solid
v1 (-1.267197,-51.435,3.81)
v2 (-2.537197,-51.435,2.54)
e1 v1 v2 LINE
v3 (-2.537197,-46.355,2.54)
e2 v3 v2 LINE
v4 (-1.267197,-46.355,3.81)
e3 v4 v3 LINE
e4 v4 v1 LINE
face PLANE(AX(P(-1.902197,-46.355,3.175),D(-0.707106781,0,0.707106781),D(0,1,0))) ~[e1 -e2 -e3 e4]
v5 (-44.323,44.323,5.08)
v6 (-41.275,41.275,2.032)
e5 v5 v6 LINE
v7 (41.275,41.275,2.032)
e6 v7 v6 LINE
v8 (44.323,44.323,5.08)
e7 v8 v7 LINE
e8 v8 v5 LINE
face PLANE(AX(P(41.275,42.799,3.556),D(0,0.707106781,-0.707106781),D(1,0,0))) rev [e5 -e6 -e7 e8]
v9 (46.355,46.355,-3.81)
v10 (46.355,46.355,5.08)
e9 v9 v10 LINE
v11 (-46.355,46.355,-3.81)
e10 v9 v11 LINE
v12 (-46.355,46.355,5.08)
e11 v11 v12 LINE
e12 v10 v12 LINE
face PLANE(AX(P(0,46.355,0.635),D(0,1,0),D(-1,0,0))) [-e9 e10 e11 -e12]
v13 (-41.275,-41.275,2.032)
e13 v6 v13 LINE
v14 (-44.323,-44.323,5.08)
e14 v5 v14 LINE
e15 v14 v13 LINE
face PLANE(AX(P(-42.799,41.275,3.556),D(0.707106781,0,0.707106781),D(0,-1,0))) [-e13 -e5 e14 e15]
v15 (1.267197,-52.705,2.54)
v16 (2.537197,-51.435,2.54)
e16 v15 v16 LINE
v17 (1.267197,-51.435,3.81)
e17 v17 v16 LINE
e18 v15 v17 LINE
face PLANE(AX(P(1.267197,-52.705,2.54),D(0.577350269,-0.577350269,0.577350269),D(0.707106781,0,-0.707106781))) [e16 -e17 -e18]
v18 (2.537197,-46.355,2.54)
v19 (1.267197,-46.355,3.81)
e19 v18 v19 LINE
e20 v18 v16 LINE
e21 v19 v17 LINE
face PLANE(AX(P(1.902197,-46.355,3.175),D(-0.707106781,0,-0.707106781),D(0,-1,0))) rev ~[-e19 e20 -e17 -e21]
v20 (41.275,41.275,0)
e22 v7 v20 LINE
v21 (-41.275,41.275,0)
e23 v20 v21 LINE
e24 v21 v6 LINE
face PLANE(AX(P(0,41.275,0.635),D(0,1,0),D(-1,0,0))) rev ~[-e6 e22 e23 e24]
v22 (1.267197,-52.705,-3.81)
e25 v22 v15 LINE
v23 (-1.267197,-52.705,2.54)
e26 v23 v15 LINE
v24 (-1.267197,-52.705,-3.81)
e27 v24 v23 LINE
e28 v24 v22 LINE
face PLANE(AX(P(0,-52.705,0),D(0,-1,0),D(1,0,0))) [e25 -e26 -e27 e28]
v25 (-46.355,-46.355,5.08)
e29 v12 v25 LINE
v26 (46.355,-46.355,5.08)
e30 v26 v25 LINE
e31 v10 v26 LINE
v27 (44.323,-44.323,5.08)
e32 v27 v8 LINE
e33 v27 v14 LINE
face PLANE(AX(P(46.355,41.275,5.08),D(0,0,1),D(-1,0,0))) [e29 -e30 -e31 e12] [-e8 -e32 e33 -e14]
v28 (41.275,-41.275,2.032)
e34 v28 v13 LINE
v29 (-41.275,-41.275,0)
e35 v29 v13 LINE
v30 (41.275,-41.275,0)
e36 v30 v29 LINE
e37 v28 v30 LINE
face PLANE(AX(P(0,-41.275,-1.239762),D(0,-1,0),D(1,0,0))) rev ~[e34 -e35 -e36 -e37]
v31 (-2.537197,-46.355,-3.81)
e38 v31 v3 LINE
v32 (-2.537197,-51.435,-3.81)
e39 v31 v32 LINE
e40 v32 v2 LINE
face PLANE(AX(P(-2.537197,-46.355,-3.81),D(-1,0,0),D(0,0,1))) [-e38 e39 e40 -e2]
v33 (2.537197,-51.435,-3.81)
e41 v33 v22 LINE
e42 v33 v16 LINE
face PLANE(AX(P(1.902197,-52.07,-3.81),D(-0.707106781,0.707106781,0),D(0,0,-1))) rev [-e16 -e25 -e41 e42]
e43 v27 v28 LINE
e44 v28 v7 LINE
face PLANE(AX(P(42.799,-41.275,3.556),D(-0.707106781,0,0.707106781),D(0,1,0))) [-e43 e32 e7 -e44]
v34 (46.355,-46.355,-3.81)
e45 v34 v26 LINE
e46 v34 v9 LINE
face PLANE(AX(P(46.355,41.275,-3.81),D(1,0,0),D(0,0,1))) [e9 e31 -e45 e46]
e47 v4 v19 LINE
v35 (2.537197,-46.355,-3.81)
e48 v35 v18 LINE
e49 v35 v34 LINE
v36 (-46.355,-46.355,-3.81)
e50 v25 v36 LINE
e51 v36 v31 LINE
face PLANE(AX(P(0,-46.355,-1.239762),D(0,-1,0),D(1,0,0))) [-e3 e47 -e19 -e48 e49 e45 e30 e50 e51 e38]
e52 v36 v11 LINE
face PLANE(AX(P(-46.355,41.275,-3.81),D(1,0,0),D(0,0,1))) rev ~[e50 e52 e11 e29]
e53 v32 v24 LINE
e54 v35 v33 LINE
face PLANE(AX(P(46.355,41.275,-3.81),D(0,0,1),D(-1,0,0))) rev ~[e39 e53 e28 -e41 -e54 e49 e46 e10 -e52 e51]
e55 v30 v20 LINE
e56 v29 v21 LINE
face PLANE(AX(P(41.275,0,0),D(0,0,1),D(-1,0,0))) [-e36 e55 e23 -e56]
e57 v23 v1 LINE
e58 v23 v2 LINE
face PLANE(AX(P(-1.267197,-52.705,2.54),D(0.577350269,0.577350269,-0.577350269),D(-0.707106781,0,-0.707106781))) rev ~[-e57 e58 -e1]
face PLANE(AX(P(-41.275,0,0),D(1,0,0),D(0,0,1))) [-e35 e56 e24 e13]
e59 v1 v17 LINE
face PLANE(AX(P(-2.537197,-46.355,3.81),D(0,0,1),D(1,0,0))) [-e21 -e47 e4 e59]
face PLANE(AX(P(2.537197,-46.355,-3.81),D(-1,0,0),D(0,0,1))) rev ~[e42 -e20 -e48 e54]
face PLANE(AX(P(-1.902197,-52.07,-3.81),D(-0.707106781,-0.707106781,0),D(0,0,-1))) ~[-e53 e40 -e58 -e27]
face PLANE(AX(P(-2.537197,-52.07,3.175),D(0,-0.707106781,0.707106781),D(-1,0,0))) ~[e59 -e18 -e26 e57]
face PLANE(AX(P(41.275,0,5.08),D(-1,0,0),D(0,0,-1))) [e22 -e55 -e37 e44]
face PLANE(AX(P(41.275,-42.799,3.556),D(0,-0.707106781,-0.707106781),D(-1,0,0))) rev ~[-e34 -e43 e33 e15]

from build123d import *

# Parameters (mm, degrees)
F1_DEPTH = 41.275
F2_W     = 82.55
F2_H     = 5.08
F3_DEPTH = 5.08
F4_W     = 92.71
F4_H     = 8.89
F5_DEPTH = 5.08
F6_W     = 5.0743944012
F6_H     = 7.62
F7_DEPTH = 6.35
F8_SIZE  = 1.27
F9_SIZE  = 3.048


with BuildPart() as f1:
    # F0 (on Front) → F1 (new body, symmetric)
    with BuildSketch(Plane.XZ):
        Polygon((-41.275, -3.81), (-41.275, 0), (-41.275, 5.08), (-46.355, 5.08), (-46.355, -3.81), align=None)
        Polygon((41.275, 0), (0, 0), (-41.275, 0), (-41.275, -3.81), (41.275, -3.81), align=None)
        Polygon((41.275, 5.08), (41.275, 0), (41.275, -3.81), (46.355, -3.81), (46.355, 5.08), align=None)
    extrude(amount=F1_DEPTH, both=True)

    # F2 (on face) → F3 (join)
    with BuildSketch(Plane.XZ.offset(41.275)):
        Polygon((-46.355, 5.08), (-46.355, -3.81), (46.355, -3.81), (46.355, 5.08), (41.275, 5.08), (41.275, 0), (-41.275, 0), (-41.275, 5.08), align=None)
        with Locations((0, 2.54)):
            Rectangle(F2_W, F2_H)
    extrude(amount=F3_DEPTH)

    # F4 (on face) → F5 (join)
    with BuildSketch(Plane(origin=(0, 41.275, 0), x_dir=(-1, 0, 0), z_dir=(0, 1, 0))):
        with Locations((0, 0.635)):
            Rectangle(F4_W, F4_H)
    extrude(amount=F5_DEPTH)

    # F6 (on face) → F7 (join)
    with BuildSketch(Plane.XZ.offset(46.355)):
        Rectangle(F6_W, F6_H)
    extrude(amount=F7_DEPTH)

    # F8
    f8_edges = [f1.edges().sort_by_distance(p)[0] for p in [
        (-2.537197, -49.53, 3.81),
        (2.537197, -49.53, 3.81),
        (0, -52.705, 3.81),
        (2.537197, -52.705, 0),
        (-2.537197, -52.705, 0),
    ]]
    chamfer(f8_edges, length=F8_SIZE)

    # F9
    f9_edges = [f1.edges().sort_by_distance(p)[0] for p in [
        (-41.275, 0, 5.08),
        (0, 41.275, 5.08),
        (0, -41.275, 5.08),
        (41.275, 0, 5.08),
    ]]
    chamfer(f9_edges, length=F9_SIZE)


solid = f1.part
